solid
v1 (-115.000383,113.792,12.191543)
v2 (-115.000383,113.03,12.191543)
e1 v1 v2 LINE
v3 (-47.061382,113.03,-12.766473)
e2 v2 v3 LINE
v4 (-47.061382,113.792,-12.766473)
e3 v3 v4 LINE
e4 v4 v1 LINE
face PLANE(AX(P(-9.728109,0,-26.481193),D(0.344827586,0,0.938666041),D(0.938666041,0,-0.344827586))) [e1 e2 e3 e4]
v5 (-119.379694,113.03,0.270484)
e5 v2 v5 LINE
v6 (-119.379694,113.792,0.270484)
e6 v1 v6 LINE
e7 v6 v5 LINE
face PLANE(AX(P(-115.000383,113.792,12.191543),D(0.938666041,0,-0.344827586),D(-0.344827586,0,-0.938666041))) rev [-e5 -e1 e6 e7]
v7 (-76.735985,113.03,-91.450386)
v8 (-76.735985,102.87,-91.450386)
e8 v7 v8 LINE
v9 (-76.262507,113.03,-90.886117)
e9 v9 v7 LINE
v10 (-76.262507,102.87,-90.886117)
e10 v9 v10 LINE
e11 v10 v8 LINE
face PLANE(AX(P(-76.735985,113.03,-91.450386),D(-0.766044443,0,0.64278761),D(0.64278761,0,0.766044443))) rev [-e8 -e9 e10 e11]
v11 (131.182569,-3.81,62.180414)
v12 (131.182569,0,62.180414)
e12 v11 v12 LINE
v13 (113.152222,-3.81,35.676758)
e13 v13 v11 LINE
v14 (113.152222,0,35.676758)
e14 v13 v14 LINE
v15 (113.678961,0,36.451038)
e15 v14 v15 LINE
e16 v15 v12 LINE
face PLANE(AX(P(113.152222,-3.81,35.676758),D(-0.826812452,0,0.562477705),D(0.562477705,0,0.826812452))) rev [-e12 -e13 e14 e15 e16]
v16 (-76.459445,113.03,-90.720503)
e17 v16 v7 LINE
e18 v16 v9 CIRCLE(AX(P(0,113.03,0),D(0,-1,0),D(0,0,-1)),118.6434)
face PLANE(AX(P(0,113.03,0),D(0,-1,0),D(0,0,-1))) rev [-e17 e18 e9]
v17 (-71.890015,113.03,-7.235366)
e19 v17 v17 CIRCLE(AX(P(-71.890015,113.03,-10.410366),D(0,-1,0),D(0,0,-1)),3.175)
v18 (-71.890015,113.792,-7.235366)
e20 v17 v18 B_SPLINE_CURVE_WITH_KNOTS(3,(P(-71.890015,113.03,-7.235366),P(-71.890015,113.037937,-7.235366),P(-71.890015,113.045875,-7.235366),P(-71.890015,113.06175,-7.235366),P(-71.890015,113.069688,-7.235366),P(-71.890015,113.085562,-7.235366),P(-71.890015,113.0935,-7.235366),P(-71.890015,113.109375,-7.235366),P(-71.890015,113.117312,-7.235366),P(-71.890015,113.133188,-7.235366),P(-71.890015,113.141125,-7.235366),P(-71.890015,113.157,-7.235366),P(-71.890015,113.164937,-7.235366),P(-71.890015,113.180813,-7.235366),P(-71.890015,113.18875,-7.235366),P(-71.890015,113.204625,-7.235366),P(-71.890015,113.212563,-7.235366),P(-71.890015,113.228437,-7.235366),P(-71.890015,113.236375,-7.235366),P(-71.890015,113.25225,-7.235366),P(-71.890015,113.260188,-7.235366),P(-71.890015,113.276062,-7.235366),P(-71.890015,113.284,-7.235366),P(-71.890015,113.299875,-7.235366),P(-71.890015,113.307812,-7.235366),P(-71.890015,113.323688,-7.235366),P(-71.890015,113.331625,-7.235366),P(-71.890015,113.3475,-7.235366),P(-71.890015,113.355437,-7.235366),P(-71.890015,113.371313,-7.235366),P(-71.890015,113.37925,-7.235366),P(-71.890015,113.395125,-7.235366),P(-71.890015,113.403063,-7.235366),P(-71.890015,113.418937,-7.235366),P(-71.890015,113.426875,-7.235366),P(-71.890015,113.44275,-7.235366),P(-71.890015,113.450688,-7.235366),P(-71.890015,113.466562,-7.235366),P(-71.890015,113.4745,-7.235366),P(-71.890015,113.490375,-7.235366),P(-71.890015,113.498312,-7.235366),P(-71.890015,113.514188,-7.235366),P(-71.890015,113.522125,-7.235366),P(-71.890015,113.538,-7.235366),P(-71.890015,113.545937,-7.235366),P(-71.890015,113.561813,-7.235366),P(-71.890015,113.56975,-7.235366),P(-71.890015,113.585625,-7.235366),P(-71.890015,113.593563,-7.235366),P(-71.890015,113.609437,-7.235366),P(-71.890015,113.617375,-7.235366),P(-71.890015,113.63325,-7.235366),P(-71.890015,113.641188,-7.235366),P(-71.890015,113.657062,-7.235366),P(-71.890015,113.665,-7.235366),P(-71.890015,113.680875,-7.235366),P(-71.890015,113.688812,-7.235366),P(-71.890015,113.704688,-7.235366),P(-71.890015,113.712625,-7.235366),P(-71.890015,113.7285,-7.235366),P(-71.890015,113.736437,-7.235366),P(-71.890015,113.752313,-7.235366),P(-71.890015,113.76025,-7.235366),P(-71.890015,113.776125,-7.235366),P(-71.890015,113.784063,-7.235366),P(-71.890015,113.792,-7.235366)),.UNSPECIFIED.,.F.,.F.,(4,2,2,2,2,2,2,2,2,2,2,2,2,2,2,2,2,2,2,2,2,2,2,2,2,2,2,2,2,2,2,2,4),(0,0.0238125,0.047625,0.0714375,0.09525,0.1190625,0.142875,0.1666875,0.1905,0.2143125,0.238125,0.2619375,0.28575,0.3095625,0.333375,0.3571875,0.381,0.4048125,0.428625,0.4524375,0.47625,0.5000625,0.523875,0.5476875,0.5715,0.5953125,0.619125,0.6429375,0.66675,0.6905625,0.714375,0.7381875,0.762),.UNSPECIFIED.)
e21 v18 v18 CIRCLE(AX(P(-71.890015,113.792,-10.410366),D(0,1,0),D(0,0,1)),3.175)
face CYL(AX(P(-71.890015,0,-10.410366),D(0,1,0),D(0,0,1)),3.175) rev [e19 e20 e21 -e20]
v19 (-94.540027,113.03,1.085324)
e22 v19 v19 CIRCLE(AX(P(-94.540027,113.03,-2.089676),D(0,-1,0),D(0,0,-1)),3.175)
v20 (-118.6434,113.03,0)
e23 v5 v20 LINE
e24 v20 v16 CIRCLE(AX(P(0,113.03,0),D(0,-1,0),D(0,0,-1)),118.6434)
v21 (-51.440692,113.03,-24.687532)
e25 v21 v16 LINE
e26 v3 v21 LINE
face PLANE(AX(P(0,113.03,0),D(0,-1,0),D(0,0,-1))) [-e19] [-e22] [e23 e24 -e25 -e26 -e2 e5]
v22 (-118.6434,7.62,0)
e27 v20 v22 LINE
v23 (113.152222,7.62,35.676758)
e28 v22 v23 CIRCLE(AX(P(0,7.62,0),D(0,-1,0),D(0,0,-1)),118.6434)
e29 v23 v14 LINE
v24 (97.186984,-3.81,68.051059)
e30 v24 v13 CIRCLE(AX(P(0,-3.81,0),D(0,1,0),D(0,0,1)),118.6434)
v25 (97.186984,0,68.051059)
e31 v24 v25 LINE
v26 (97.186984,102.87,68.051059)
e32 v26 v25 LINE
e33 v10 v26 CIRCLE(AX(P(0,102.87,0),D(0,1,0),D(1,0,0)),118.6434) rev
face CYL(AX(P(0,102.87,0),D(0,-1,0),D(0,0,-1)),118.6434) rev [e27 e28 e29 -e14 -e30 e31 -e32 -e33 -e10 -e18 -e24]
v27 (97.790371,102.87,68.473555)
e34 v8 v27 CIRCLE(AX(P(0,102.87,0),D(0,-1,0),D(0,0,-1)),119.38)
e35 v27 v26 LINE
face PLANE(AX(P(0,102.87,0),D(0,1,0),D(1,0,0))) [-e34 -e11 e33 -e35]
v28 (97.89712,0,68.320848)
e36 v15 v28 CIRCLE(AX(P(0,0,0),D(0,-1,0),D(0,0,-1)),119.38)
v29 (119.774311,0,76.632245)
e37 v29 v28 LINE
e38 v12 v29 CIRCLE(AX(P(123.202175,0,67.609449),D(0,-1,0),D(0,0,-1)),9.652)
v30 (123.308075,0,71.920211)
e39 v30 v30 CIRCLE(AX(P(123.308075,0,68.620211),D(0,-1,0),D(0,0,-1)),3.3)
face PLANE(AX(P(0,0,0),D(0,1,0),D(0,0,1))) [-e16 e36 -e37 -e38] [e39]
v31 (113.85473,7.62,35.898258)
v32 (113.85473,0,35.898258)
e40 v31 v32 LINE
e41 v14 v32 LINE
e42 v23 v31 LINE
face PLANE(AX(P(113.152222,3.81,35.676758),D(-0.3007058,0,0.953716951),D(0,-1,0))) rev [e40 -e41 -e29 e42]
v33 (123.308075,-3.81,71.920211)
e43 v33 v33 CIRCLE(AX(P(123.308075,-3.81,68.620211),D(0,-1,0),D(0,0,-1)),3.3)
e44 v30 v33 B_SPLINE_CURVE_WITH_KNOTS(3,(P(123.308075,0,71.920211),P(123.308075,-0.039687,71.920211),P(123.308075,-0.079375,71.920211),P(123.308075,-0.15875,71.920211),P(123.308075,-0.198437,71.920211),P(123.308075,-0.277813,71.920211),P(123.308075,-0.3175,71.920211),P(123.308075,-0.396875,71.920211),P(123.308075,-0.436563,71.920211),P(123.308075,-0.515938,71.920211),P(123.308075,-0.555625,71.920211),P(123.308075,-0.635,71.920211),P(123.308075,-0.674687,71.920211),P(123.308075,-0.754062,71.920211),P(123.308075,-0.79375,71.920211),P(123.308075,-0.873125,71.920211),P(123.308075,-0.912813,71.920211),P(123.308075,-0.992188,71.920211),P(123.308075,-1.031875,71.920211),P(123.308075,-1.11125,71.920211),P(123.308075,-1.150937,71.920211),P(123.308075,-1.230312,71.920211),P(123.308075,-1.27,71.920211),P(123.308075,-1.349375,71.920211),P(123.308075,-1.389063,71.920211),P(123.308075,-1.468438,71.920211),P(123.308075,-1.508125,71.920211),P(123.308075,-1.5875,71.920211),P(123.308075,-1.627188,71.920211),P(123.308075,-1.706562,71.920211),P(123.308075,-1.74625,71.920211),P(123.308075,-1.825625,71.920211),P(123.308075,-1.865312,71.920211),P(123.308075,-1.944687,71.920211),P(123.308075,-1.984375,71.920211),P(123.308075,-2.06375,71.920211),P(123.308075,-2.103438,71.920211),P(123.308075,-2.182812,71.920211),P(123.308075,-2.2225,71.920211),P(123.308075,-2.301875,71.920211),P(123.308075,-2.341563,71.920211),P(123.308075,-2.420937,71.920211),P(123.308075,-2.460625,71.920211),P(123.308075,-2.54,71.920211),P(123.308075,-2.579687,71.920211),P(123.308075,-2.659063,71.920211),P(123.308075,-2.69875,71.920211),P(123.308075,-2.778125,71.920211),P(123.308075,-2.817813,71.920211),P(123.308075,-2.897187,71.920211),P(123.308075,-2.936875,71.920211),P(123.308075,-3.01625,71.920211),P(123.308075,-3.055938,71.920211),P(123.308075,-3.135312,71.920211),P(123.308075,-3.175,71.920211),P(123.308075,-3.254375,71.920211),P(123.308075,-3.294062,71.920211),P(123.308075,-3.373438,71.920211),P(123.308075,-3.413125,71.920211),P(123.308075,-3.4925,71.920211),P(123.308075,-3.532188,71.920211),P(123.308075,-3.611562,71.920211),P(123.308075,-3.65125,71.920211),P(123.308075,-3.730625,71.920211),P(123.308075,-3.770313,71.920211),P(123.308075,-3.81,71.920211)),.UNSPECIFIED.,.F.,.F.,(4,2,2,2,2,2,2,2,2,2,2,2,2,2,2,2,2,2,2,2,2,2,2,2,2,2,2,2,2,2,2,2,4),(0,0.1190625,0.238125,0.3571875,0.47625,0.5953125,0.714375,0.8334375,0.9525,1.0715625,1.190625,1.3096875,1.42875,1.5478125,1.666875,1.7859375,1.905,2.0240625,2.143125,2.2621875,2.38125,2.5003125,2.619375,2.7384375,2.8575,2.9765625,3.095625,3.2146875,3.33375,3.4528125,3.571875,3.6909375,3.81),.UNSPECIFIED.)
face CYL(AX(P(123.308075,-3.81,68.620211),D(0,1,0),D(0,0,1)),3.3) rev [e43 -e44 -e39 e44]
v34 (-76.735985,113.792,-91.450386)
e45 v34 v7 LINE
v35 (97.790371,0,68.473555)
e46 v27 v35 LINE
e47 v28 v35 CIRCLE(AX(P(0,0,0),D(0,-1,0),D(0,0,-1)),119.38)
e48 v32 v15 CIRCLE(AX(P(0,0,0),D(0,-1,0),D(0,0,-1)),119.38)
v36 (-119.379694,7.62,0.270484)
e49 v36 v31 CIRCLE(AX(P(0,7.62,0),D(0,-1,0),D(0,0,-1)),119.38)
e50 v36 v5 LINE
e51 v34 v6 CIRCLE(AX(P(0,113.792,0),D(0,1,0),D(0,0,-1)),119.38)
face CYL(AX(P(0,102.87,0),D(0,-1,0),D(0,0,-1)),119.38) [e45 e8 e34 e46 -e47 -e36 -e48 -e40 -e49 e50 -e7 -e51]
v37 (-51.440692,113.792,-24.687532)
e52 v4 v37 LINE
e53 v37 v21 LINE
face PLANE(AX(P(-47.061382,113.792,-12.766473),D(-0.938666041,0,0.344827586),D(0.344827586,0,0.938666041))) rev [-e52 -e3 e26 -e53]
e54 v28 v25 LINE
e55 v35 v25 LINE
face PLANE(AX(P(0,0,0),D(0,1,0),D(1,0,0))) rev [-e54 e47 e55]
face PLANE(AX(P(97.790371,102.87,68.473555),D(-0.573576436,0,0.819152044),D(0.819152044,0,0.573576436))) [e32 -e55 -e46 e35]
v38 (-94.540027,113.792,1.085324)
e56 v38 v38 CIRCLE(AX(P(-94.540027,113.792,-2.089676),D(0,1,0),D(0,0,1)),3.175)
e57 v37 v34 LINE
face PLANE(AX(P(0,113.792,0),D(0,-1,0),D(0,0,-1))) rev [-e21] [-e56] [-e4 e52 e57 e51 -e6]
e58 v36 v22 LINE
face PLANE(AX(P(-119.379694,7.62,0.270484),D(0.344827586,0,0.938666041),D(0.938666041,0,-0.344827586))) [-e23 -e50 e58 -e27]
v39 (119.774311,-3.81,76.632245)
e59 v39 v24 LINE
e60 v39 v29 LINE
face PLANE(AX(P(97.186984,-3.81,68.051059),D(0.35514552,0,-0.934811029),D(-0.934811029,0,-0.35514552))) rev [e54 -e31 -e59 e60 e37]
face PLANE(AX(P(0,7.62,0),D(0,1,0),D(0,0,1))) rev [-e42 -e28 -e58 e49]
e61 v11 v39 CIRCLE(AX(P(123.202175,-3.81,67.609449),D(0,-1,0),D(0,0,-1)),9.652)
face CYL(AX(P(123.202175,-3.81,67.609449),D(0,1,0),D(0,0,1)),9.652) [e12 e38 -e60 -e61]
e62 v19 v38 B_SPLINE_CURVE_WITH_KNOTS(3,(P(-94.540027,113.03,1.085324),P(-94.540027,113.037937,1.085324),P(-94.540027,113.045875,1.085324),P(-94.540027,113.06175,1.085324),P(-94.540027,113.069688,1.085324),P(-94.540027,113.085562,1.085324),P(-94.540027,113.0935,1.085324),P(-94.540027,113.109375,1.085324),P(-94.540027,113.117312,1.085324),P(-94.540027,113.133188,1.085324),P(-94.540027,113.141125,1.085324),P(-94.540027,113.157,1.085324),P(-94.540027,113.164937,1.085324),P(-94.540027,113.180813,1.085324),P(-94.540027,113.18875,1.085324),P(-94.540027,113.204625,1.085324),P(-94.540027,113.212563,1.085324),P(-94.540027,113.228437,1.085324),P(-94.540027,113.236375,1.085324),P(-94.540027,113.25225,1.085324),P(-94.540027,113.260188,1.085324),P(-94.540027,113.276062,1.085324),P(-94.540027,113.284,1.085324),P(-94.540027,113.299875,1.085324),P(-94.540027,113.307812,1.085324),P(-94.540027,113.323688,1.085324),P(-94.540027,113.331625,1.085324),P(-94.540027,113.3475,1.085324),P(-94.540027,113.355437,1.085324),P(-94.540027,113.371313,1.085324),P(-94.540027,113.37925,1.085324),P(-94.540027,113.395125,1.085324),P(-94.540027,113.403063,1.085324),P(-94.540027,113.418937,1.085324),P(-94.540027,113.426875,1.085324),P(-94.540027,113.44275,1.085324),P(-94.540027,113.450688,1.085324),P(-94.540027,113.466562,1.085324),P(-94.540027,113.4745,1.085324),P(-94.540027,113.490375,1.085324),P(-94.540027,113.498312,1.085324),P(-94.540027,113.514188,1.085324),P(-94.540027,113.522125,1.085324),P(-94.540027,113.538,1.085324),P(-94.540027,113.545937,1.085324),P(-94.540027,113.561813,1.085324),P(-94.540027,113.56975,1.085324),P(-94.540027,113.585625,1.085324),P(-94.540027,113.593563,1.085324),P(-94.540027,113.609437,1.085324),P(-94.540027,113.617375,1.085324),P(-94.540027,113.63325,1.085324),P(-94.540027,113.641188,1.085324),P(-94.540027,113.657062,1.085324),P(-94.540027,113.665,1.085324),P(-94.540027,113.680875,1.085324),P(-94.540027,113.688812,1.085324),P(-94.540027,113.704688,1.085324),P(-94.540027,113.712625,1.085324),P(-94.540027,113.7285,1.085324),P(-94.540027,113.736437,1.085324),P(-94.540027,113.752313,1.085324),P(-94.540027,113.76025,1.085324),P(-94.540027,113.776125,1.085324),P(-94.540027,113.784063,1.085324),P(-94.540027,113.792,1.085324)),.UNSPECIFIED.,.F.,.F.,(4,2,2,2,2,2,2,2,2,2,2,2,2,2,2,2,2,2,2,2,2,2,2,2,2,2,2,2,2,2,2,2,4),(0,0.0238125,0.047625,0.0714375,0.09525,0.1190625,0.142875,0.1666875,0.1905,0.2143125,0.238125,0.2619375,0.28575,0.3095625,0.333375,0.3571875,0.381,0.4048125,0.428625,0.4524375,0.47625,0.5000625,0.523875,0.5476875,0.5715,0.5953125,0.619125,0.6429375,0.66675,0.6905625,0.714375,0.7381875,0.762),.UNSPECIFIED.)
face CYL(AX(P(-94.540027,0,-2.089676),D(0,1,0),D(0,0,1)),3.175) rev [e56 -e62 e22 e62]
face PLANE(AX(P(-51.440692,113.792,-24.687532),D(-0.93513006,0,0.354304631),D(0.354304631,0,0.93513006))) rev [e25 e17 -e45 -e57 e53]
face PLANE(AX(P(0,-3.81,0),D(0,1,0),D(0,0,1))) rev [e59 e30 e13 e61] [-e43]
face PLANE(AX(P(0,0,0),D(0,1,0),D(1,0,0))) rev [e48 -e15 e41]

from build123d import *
from build123d.topology import SkipClean

# Parameters (mm, degrees)
BASE_FLANGE1_DEPTH  = 102.87
CUT_EXTRUDE1_START  = -7.62
CUT_EXTRUDE1_DEPTH  = 7.62
BOSS_EXTRUDE5_START = -95.25
BOSS_EXTRUDE5_DEPTH = 95.25
BOSS_EXTRUDE6_DEPTH = 10.16
BOSS_EXTRUDE7_DEPTH = 0.762
SKETCH12_W          = 72.378245623
SKETCH12_H          = 0.762
BOSS_EXTRUDE8_DEPTH = 12.7
SKETCH13_R          = 3.175
CUT_EXTRUDE2_DEPTH  = 204.597121983
BOSS_EXTRUDE9_START = 3.81
BOSS_EXTRUDE9_DEPTH = 3.81


# Read off the part's stored shape, not the designer's step: Cut-Extrude1
# Sheet-metal steps are written as plain solids
with BuildPart() as part:
    # Sketch2 → Base-Flange1 (new body)
    with BuildSketch(Plane(origin=(0, 0, 0), x_dir=(1, 0, 0), z_dir=(0, 1, 0))):
        with BuildLine():
            ThreePointArc((-119.38, 0), (35.898258345, 113.85472958), (97.790371047, -68.473554972))
            Line((97.790371047, -68.473554972), (97.186983651, -68.051058569))
            ThreePointArc((97.186983651, -68.051058569), (35.676758453, 113.152221674), (-118.6434, 0))
            Line((-118.6434, 0), (-119.38, 0))
        make_face()
    extrude(amount=BASE_FLANGE1_DEPTH)

    # Cut-Extrude1 outline → Cut-Extrude1 (cut)
    with BuildSketch(Plane.XZ.offset(CUT_EXTRUDE1_START)):
        with BuildLine():
            ThreePointArc((-119.38, 0), (18.160489843, -117.990597119), (113.85472958, 35.898258345))
            Line((113.85472958, 35.898258345), (113.152221674, 35.676758453))
            ThreePointArc((113.152221674, 35.676758453), (18.048435757, -117.262570031), (-118.6434, 0))
            Line((-118.6434, 0), (-119.38, 0))
        make_face()
    extrude(amount=CUT_EXTRUDE1_DEPTH, mode=Mode.SUBTRACT)

    # Sketch9 → Boss-Extrude5 (add)
    with BuildSketch(Plane(origin=(0, 102.87, 0), x_dir=(1, 0, 0), z_dir=(0, 1, 0)).offset(BOSS_EXTRUDE5_START)):
        with BuildLine():
            Line((-119.379693576, -0.270484204), (-118.6434, 0))
            Line((-118.6434, 0), (-119.38, 0))
            ThreePointArc((-119.38, 0), (-119.379923394, -0.135242189), (-119.379693576, -0.270484204))
        make_face()
    extrude(amount=BOSS_EXTRUDE5_DEPTH)

    # Sketch10 → Boss-Extrude6 (add)
    with SkipClean():  # the faces are left unmerged after this step: merging them gives an invalid solid
        with BuildSketch(Plane(origin=(0, 102.87, 0), x_dir=(1, 0, 0), z_dir=(0, 1, 0))):
            with BuildLine():
                Line((-119.379693576, -0.270484204), (-118.6434, 0))
                ThreePointArc((-118.6434, 0), (-107.527437301, 50.140867475), (-76.262507491, 90.886117283))
                Line((-76.262507491, 90.886117283), (-76.735984844, 91.45038562))
                ThreePointArc((-76.735984844, 91.45038562), (-108.252110006, 50.329564663), (-119.379693576, -0.270484204))
            make_face()
        extrude(amount=BOSS_EXTRUDE6_DEPTH)

    # Sketch11 → Boss-Extrude7 (add)
    with SkipClean():  # the faces are left unmerged after this step: merging them gives an invalid solid
        with BuildSketch(Plane(origin=(0, 113.03, 0), x_dir=(1, 0, 0), z_dir=(0, 1, 0))):
            with BuildLine():
                Line((-119.379693576, -0.270484204), (-51.440692331, 24.687531528))
                Line((-51.440692331, 24.687531528), (-76.735984844, 91.45038562))
                ThreePointArc((-76.735984844, 91.45038562), (-108.252110006, 50.329564663), (-119.379693576, -0.270484204))
            make_face()
        extrude(amount=BOSS_EXTRUDE7_DEPTH)

    # Sketch12 → Boss-Extrude8 (add)
    with SkipClean():  # the faces are left unmerged after this step: merging them gives an invalid solid
        with BuildSketch(Plane(origin=(-14.107419738, 0, -38.402251904), x_dir=(0.9386660406079884, 0, -0.3448275862069655), z_dir=(0.3448275862069655, 0, 0.9386660406079884))):
            with Locations((-75.961811901, 113.411)):
                Rectangle(SKETCH12_W, SKETCH12_H)
        extrude(amount=BOSS_EXTRUDE8_DEPTH)

    # Sketch13 → Cut-Extrude2 (cut, through all)
    with SkipClean():  # the faces are left unmerged after this step: merging them gives an invalid solid
        with BuildSketch(Plane(origin=(0, 113.792, 0), x_dir=(1, 0, 0), z_dir=(0, 1, 0))):
            with Locations(Location((-94.540026844, 2.089676094, 0), (0, 0, 270))):
                Circle(SKETCH13_R)
            with Locations(Location((-71.890015284, 10.410365749, 0), (0, 0, 270))):
                Circle(SKETCH13_R)
        extrude(amount=-CUT_EXTRUDE2_DEPTH, mode=Mode.SUBTRACT)

    # Sketch14 → Boss-Extrude9 (add)
    with SkipClean():  # the faces are left unmerged after this step: merging them gives an invalid solid
        with BuildSketch(Plane.XZ.offset(BOSS_EXTRUDE9_START)):
            with BuildLine():
                Line((97.186983651, 68.051058569), (119.774310511, 76.632245246))
                ThreePointArc((119.774310511, 76.632245246), (130.778139327, 73.589906503), (131.18256886, 62.180414385))
                Line((131.18256886, 62.180414385), (113.152221674, 35.676758453))
                ThreePointArc((113.152221674, 35.676758453), (106.408031423, 52.474633989), (97.186983651, 68.051058569))
            make_face()
            with BuildLine():
                ThreePointArc((126.590987662, 68.955600398), (122.972686098, 71.90312373), (120.025162766, 68.284822166))
                ThreePointArc((120.025162766, 68.284822166), (123.64346433, 65.337298834), (126.590987662, 68.955600398))
            make_face(mode=Mode.SUBTRACT)
        extrude(amount=-BOSS_EXTRUDE9_DEPTH)


solid = part.part
